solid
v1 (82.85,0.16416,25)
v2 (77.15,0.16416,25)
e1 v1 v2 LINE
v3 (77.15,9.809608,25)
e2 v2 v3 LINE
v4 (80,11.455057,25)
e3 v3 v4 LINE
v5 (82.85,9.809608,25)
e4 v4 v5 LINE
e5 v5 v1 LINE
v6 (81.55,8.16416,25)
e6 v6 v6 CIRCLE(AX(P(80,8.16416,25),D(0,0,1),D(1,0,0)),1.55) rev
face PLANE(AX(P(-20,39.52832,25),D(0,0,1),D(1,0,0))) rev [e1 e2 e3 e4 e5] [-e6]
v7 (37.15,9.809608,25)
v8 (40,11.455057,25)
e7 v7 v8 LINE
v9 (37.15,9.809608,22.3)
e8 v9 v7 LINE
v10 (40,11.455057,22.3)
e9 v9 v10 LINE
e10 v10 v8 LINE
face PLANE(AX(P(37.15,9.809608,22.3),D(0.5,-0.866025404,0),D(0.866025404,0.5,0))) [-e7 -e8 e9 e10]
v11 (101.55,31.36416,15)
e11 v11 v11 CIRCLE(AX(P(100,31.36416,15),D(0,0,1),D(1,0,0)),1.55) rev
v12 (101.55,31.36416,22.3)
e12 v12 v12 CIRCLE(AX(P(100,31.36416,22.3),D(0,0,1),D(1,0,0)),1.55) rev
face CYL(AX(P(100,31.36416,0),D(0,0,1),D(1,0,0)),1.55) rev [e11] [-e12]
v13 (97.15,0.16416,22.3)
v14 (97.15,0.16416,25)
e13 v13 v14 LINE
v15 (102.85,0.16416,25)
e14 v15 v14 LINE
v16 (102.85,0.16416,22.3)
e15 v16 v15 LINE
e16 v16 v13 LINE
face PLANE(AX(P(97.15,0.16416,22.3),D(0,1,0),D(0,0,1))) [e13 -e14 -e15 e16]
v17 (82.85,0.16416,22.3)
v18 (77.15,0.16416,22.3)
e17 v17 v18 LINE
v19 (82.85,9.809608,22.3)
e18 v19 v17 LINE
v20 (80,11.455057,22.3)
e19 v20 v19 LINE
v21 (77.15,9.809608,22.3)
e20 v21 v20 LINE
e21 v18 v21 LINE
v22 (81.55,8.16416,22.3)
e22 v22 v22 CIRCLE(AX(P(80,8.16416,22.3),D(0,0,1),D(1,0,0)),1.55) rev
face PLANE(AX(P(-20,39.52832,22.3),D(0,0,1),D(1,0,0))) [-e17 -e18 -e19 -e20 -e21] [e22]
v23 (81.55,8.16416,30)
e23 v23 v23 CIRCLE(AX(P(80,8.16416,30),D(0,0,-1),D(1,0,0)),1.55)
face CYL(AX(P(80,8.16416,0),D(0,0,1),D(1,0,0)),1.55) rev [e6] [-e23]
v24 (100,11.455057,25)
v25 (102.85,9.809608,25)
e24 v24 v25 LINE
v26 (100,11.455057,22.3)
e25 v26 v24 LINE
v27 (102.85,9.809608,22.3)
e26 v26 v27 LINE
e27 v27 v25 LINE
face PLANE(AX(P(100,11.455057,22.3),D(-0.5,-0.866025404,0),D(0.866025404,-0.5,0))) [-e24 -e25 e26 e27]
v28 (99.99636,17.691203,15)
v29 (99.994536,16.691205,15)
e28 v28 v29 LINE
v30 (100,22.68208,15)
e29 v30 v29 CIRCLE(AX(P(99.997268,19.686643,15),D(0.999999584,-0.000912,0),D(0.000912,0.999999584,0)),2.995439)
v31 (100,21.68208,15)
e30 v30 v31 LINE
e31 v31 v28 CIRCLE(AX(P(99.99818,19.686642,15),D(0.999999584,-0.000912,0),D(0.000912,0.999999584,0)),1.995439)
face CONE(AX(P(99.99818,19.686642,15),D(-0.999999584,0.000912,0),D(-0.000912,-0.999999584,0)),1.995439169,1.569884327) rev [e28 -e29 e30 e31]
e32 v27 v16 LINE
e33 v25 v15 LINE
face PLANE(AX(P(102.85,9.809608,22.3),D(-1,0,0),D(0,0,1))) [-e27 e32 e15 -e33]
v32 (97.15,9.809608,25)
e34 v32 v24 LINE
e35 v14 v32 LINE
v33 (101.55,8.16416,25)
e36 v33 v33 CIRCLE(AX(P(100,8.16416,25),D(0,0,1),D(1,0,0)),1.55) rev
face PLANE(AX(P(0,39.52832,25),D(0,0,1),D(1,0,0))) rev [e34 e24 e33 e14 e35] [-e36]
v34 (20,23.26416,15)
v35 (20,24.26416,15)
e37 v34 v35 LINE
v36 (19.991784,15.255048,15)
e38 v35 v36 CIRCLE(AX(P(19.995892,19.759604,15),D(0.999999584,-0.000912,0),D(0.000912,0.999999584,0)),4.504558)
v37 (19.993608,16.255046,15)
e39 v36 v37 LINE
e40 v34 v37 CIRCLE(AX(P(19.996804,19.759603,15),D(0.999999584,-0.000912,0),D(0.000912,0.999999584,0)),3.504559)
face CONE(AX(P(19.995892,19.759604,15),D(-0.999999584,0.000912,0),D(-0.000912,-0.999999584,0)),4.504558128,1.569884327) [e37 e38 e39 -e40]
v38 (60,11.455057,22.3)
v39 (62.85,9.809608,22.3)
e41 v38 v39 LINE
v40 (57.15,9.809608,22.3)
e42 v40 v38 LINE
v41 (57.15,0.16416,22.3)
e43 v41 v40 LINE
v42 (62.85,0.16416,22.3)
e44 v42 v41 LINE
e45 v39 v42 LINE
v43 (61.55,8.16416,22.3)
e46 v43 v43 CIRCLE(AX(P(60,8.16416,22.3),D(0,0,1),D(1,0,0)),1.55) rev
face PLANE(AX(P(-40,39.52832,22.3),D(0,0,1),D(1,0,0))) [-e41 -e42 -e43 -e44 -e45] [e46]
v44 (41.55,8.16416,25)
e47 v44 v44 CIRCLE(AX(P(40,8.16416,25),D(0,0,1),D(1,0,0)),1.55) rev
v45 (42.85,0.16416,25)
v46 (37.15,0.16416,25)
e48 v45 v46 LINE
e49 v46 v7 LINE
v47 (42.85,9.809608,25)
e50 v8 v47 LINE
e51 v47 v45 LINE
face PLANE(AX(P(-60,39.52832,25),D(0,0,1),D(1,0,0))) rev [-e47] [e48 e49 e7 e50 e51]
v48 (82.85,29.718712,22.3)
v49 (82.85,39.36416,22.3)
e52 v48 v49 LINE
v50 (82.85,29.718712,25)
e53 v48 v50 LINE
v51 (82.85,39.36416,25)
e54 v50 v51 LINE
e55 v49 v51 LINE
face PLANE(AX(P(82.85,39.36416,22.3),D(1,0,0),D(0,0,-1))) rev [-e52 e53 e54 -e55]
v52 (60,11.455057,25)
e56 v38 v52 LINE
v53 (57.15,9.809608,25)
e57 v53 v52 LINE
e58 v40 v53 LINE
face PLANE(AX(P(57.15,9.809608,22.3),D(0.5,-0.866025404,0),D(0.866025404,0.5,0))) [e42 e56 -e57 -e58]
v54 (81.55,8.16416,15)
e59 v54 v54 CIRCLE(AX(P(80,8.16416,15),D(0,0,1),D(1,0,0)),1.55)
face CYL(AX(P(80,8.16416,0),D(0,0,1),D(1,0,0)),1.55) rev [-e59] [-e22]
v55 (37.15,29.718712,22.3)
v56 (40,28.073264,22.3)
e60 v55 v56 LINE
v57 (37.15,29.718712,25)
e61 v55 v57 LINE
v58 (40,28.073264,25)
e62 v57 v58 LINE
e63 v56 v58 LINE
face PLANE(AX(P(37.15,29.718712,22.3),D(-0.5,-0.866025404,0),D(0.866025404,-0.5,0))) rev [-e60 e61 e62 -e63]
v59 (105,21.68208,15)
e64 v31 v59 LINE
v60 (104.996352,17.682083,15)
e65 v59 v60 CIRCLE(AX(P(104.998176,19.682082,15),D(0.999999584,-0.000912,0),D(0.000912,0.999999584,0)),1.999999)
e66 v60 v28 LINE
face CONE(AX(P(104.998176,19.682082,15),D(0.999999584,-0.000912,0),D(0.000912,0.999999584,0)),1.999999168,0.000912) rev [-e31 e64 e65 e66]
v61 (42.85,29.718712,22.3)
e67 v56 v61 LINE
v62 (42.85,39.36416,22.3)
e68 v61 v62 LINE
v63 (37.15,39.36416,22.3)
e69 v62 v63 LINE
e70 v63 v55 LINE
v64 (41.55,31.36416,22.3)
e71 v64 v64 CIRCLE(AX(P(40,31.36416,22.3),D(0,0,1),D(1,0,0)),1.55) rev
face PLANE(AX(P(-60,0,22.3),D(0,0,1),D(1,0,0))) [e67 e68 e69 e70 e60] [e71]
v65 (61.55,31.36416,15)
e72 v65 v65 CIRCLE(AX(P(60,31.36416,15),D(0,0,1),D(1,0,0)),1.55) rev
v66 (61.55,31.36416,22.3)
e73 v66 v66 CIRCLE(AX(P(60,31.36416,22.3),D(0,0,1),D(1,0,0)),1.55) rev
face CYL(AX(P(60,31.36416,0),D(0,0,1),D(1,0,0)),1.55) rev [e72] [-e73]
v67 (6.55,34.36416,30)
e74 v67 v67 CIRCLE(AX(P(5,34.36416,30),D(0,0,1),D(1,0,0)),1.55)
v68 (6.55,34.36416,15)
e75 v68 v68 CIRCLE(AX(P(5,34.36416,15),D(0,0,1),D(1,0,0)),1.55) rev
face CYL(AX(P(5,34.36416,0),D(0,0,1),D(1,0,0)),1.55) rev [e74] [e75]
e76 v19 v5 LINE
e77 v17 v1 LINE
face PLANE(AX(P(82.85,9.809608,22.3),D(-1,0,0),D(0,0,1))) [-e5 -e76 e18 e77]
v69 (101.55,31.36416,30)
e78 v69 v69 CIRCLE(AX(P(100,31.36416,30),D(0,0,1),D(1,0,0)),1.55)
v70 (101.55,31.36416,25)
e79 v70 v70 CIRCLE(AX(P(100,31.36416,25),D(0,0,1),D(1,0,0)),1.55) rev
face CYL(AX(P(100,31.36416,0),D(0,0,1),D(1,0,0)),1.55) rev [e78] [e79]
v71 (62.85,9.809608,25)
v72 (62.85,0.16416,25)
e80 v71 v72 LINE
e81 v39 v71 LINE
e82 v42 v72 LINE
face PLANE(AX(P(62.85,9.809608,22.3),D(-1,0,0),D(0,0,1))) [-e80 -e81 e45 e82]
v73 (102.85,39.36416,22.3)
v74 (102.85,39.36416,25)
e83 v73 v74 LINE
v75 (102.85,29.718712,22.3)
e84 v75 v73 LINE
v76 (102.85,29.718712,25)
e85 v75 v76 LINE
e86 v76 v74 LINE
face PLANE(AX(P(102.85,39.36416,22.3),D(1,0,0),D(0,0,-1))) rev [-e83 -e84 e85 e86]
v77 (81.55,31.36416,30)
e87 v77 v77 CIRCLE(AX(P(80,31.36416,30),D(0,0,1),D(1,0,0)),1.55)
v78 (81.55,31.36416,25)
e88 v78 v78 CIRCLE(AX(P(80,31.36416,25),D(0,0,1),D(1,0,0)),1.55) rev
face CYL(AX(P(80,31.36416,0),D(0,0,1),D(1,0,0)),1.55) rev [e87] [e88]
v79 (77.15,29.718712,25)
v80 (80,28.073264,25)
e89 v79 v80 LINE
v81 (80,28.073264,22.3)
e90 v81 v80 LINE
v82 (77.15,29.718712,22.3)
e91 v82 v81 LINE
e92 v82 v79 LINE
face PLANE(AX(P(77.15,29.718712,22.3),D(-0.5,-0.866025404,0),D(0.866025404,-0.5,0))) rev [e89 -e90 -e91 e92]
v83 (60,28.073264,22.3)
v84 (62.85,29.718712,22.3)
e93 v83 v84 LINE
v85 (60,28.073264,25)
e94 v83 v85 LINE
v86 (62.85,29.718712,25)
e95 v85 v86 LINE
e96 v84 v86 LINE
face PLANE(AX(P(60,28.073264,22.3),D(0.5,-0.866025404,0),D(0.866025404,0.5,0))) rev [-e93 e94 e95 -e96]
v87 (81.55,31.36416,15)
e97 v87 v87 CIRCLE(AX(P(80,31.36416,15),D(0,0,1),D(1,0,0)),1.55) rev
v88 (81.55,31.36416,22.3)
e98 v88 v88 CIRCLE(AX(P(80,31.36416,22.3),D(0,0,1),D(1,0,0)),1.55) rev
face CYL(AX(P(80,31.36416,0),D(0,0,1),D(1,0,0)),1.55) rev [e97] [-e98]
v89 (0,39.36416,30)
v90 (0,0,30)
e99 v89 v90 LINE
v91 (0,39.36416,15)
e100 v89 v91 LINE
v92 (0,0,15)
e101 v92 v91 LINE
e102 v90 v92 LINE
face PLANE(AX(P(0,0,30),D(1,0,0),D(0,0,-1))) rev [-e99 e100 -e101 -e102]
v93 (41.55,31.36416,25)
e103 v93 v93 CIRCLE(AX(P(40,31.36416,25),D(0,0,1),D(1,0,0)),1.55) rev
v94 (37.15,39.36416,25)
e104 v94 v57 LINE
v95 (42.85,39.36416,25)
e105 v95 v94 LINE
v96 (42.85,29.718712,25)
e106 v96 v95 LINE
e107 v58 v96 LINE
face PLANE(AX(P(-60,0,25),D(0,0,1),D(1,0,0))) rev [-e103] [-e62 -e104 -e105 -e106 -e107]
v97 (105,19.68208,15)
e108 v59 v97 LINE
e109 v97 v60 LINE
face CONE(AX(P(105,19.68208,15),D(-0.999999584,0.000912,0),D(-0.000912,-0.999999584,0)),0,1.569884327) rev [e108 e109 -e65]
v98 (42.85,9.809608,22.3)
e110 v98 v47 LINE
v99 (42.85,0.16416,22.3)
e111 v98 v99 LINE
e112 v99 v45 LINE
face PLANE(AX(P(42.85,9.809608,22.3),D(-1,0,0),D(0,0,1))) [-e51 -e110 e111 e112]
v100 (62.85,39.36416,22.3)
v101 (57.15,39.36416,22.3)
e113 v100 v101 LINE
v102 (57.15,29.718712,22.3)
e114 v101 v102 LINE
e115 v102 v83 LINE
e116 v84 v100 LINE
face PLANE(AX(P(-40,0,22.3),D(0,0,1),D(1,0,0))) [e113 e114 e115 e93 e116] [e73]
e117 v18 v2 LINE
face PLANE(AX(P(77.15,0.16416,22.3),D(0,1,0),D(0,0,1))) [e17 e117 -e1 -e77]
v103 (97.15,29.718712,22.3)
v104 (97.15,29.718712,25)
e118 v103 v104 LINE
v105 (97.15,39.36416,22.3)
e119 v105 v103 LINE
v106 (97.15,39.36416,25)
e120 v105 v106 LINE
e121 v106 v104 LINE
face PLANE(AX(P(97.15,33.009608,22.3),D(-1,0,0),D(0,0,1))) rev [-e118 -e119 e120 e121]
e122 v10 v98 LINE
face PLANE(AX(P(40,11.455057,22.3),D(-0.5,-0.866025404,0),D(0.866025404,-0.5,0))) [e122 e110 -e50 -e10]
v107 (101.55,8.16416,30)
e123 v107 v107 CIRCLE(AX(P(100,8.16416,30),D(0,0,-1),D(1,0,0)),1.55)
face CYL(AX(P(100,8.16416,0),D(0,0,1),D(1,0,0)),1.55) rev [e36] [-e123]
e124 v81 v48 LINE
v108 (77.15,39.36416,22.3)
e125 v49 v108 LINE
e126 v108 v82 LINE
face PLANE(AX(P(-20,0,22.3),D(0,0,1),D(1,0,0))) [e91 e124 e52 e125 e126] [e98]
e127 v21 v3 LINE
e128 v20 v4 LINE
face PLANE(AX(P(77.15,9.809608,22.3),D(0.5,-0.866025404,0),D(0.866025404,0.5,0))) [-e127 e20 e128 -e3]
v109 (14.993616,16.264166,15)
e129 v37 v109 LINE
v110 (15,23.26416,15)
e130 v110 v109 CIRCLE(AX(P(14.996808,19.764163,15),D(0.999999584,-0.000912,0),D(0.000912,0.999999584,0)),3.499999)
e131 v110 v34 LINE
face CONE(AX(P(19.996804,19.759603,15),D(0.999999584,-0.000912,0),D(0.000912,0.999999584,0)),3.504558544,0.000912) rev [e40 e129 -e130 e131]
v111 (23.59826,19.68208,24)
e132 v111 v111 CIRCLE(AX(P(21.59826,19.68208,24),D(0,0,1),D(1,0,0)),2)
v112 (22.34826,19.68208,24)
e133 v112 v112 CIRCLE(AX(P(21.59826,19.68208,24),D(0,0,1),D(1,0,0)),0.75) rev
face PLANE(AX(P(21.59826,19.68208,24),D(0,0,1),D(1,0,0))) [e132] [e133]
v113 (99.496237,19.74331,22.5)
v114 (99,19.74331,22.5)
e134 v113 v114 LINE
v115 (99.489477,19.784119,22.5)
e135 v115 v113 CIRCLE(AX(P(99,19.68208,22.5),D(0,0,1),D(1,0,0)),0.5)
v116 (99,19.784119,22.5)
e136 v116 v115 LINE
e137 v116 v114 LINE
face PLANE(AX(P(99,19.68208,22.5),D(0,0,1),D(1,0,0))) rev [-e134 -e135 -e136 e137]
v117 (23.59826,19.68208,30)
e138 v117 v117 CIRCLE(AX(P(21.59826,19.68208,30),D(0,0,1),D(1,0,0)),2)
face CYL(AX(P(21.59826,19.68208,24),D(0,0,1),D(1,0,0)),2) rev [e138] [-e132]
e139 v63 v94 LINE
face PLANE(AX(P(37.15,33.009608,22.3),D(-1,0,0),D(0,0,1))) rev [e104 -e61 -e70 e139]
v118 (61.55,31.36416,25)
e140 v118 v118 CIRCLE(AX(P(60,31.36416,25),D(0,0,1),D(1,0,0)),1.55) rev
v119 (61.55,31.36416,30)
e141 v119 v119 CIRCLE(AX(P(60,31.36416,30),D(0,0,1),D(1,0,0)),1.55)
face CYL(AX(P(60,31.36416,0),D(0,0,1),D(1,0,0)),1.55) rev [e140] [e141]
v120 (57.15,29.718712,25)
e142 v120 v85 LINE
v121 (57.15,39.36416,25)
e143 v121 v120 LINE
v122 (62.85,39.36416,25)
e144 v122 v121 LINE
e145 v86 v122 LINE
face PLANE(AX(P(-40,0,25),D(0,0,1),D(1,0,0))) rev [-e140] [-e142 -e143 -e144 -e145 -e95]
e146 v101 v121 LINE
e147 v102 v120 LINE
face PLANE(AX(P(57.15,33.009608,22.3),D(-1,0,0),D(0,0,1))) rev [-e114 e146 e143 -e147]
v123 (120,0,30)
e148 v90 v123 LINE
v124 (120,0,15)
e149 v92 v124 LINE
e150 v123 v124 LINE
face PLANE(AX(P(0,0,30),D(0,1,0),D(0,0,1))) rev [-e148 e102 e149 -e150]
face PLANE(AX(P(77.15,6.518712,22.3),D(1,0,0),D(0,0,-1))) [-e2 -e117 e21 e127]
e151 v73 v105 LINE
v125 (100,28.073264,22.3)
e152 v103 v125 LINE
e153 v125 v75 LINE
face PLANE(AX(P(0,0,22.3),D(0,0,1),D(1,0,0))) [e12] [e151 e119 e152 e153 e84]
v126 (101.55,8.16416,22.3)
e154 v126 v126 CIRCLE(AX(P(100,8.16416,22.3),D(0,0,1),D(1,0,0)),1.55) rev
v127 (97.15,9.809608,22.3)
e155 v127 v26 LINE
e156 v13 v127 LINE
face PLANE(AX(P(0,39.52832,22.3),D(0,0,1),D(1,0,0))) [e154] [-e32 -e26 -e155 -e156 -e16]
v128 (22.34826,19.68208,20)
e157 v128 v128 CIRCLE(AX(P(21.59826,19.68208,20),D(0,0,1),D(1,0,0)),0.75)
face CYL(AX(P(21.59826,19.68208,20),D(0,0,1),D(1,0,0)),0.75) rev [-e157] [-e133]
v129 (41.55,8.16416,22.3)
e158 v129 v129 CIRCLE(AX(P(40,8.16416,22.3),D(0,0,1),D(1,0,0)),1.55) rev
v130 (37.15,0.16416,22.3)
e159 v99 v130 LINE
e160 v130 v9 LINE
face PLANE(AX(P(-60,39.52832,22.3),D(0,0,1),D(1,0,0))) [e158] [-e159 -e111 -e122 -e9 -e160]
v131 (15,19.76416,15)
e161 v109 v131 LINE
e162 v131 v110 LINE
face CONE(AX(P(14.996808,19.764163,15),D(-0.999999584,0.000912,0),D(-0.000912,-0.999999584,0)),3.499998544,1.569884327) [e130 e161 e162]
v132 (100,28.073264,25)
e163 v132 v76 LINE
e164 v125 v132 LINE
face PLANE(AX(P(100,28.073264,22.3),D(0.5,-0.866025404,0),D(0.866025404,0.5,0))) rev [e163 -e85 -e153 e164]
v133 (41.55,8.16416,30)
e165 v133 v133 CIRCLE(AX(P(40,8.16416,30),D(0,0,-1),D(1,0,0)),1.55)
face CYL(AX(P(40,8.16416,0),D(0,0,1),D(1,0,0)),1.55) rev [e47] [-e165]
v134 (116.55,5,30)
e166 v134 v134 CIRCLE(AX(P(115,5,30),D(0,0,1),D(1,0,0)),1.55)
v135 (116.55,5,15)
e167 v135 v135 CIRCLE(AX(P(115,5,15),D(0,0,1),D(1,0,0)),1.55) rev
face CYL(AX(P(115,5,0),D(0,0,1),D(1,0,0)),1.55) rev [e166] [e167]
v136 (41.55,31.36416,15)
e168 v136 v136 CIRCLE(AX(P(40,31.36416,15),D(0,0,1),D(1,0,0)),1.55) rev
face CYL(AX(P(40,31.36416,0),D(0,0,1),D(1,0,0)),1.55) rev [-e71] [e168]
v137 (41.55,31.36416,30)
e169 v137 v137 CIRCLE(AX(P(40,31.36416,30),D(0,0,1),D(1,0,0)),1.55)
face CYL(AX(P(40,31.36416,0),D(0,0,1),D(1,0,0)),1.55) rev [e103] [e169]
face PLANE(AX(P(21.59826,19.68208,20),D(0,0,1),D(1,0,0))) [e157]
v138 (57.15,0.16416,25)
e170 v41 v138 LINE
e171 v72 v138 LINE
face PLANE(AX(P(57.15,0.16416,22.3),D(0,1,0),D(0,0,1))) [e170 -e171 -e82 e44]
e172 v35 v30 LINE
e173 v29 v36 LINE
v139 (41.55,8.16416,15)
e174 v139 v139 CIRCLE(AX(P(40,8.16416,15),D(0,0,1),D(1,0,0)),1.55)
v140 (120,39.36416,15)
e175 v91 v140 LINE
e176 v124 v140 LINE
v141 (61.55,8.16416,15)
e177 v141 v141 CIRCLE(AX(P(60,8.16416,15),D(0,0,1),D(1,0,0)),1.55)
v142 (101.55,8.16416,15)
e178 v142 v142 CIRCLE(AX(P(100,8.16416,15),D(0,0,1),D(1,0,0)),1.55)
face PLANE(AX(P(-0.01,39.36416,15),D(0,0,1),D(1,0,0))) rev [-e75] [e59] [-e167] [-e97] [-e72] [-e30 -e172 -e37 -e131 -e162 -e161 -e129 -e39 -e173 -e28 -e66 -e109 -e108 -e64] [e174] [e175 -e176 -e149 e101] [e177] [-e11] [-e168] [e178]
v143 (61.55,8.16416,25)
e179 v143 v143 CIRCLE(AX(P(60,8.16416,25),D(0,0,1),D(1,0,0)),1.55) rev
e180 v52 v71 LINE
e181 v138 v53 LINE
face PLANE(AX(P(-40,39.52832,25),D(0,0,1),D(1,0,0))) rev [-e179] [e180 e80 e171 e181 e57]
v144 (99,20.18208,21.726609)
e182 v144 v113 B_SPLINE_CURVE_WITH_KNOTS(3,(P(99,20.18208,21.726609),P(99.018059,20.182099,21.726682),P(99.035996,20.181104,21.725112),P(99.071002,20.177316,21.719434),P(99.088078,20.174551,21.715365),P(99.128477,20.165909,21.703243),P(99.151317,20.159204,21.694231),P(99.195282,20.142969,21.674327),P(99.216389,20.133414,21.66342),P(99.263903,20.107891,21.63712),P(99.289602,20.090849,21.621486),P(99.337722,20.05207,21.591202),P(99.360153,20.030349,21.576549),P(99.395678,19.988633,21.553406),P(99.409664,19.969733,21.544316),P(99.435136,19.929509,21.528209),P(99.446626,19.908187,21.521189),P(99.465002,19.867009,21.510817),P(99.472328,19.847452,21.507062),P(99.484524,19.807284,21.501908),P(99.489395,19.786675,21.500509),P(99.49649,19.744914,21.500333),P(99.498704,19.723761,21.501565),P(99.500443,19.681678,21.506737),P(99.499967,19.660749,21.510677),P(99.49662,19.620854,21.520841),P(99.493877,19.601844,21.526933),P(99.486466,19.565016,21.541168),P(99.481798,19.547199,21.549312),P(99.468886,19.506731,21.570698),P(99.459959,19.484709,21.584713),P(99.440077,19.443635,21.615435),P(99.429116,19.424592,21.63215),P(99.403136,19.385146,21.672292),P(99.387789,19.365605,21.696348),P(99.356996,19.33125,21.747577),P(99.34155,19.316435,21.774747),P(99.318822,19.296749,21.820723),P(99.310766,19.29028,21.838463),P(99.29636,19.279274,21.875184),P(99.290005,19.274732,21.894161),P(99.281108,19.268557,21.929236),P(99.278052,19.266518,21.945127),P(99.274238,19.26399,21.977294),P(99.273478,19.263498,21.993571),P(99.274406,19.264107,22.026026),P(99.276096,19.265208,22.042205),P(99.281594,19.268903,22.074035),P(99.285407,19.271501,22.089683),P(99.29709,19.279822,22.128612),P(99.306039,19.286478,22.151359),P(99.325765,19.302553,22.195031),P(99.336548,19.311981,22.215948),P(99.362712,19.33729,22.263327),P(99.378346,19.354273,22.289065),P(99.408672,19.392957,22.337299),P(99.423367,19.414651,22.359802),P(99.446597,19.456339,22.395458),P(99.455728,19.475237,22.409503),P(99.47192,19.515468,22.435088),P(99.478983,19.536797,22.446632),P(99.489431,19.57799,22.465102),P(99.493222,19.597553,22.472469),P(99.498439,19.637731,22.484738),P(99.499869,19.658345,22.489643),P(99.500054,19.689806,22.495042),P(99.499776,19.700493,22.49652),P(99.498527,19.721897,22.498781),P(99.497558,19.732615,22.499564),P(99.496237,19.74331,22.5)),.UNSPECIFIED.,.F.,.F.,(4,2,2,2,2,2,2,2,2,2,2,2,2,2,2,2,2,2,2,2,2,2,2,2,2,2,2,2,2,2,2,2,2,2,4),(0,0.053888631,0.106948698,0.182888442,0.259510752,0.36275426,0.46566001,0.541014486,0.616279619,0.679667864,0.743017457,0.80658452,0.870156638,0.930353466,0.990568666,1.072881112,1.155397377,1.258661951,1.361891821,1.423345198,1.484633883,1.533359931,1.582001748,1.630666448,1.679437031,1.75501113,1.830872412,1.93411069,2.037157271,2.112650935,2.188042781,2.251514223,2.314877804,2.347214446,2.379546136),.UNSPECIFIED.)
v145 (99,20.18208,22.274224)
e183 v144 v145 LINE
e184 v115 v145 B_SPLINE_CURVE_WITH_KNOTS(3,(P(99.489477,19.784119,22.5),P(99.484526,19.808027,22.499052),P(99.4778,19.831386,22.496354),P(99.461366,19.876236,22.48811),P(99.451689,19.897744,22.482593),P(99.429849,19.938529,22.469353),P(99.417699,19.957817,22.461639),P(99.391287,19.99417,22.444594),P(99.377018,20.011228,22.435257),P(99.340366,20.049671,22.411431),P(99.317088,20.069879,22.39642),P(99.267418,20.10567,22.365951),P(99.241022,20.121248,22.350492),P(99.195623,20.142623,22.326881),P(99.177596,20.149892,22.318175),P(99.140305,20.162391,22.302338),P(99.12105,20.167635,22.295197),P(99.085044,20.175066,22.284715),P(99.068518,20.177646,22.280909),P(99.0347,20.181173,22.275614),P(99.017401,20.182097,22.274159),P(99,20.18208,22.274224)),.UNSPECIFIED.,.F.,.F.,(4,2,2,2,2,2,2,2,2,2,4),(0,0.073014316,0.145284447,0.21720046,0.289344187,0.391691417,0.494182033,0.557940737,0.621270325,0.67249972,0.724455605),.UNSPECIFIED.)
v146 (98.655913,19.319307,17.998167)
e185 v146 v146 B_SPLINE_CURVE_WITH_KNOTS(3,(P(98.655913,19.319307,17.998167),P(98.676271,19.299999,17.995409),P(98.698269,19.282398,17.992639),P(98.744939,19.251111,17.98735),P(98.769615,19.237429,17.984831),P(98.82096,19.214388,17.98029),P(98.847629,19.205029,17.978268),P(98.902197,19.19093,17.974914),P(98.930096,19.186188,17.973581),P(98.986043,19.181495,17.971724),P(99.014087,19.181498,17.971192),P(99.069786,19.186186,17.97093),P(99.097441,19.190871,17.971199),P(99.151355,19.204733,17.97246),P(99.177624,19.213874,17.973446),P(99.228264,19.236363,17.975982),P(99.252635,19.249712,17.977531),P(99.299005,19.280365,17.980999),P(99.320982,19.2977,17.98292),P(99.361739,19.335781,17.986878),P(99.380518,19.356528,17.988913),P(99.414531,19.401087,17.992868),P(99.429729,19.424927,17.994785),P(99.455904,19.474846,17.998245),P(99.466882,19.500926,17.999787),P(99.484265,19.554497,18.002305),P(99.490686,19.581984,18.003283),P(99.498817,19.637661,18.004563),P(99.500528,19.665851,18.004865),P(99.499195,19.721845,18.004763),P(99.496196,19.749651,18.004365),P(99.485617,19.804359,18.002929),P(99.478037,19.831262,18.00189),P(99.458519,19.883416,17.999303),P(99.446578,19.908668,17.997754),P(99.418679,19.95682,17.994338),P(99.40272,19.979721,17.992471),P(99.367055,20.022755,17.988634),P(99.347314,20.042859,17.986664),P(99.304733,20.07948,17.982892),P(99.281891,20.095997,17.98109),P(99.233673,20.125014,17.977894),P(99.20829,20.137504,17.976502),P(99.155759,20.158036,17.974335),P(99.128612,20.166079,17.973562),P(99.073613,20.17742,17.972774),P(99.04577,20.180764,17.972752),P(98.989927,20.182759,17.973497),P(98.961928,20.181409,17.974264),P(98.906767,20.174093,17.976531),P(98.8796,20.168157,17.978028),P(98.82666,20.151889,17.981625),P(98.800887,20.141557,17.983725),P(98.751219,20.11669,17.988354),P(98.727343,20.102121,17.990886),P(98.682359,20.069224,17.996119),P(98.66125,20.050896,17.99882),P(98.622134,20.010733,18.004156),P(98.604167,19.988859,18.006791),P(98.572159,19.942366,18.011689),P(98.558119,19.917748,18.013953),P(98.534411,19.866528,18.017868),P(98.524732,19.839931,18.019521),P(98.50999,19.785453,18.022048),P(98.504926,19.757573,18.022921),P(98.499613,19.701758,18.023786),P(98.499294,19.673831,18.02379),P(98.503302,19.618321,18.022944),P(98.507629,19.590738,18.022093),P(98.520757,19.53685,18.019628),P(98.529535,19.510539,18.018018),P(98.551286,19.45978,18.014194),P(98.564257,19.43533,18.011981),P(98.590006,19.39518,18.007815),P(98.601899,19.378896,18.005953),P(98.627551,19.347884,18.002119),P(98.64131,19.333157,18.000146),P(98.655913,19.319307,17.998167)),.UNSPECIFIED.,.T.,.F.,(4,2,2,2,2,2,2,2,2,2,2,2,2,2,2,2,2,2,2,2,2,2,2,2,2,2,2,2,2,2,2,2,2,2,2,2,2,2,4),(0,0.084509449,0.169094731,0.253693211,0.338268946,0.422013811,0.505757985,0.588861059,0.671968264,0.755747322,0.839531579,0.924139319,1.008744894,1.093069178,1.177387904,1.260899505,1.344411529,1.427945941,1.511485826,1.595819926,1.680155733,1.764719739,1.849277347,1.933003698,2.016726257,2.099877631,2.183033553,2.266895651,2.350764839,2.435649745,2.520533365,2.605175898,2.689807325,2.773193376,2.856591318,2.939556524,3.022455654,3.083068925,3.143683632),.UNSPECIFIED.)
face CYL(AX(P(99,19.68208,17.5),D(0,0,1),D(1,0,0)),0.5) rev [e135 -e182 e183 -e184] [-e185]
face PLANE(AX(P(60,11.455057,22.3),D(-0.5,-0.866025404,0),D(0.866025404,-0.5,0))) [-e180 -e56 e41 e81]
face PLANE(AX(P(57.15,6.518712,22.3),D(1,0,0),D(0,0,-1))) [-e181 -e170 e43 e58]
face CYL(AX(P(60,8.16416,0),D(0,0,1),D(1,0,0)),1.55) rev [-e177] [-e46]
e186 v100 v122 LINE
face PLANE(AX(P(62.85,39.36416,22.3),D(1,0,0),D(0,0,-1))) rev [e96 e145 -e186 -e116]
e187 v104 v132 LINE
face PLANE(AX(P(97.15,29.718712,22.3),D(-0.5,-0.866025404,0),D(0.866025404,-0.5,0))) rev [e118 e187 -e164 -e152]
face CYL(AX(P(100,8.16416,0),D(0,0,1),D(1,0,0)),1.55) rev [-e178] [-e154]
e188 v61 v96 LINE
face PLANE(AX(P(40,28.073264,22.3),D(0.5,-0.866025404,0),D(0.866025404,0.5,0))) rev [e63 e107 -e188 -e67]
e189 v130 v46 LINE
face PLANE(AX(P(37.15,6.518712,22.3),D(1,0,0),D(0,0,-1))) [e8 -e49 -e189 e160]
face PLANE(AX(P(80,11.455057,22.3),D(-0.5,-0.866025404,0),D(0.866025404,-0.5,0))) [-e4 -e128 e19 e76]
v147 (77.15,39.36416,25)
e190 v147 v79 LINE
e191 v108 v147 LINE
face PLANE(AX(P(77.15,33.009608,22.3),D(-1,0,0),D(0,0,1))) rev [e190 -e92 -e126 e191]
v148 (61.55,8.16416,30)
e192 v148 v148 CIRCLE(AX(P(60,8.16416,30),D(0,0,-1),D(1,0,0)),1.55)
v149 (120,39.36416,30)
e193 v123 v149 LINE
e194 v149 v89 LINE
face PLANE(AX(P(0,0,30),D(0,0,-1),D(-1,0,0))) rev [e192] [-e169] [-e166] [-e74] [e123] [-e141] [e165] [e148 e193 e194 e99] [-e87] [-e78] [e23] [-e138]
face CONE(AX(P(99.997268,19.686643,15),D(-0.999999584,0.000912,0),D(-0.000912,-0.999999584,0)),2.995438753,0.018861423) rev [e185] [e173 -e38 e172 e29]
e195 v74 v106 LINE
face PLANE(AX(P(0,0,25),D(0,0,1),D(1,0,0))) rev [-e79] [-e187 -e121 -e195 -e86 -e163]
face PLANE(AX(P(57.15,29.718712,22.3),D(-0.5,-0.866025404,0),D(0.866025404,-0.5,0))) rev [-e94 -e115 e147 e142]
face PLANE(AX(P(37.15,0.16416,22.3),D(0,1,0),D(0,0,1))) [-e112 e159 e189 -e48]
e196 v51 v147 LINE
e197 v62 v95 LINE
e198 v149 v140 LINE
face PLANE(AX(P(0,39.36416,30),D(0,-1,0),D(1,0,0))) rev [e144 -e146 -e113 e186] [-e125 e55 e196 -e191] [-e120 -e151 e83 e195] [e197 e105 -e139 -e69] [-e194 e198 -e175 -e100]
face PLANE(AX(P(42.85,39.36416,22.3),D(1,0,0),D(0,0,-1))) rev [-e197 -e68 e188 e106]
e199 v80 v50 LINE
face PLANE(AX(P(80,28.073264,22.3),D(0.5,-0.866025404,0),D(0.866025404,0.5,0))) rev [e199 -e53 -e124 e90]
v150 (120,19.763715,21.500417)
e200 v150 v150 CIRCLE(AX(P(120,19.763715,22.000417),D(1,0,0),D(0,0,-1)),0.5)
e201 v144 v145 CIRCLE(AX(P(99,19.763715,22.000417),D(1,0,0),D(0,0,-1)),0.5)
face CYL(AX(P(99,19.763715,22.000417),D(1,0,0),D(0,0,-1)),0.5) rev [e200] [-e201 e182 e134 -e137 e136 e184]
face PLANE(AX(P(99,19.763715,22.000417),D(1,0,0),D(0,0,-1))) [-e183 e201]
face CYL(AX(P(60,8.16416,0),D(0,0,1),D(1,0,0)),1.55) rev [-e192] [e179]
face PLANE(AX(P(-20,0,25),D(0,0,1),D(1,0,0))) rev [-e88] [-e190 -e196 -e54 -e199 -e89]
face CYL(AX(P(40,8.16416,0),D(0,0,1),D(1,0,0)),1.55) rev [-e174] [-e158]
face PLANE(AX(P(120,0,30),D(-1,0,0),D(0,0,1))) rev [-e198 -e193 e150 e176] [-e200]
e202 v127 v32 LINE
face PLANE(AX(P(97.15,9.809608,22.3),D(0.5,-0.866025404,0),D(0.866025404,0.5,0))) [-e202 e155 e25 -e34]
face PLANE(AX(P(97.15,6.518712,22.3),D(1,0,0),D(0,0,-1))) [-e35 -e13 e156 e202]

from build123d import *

# Parameters (mm, degrees)
SKIZZE2_W                        = 120
SKIZZE2_H                        = 39.364160046
AUFSATZ_LINEAR_AUSTRAGEN1_DEPTH  = 30
SKIZZE24_R                       = 1.55
SCHNITT_LINEAR_AUSTRAGEN4_DEPTH  = 130.805766806
SKIZZE46_R                       = 2.85
SCHNITT_LINEAR_AUSTRAGEN15_DEPTH = 10
SCHNITT_LINEAR_START             = -5
SCHNITT_LINEAR_AUSTRAGEN25_DEPTH = 2.7
LINEARES_MUSTER1_COUNT           = 4
LINEARES_MUSTER1_PITCH           = 20
SPIEGELN2_COPY_1_SKETCH_R        = 2.85
SPIEGELN2_COPY_1_DEPTH           = 10
SPIEGELN2_COPY_2_SKETCH_R        = 2.85
SPIEGELN2_COPY_2_DEPTH           = 10
SPIEGELN2_COPY_3_SKETCH_R        = 2.85
SPIEGELN2_COPY_3_DEPTH           = 10
SPIEGELN2_START                  = -5
SPIEGELN2_COPY_4_DEPTH           = 2.7
SPIEGELN2_COPY_5_DEPTH           = 2.7
SPIEGELN2_COPY_6_DEPTH           = 2.7
SKIZZE51_R                       = 1.55
SCHNITT_LINEAR_AUSTRAGEN26_DEPTH = 130.805766806
SKIZZE75_R                       = 0.75
SCHNITT_LINEAR_AUSTRAGEN28_DEPTH = 10
SKIZZE76_R                       = 2
SCHNITT_LINEAR_AUSTRAGEN29_DEPTH = 6
SKIZZE80_R                       = 0.5
SCHNITT_LINEAR_AUSTRAGEN34_DEPTH = 21
SCHNITT_LINEAR_START_2           = -7.5
SKIZZE81_R                       = 0.5
SCHNITT_LINEAR_AUSTRAGEN36_DEPTH = 5
ABSPALTEN3_OUTLINE_W             = 120
ABSPALTEN3_OUTLINE_H             = 39.364160046
ABSPALTEN3_OUTLINE_R             = 1.55
ABSPALTEN3_DEPTH                 = 15


# Read off the part's stored shape, not the designer's step: Abspalten3
with BuildPart() as part:
    # Skizze2 → Aufsatz-Linear austragen1 (new body)
    with BuildSketch(Plane.XY):
        with Locations((60, 19.682080023)):
            Rectangle(SKIZZE2_W, SKIZZE2_H)
    extrude(amount=AUFSATZ_LINEAR_AUSTRAGEN1_DEPTH)

    # Skizze24 → Schnitt-Linear austragen4 (cut, through all)
    with BuildSketch(Plane.XY.offset(30)):
        with Locations((40, 31.364160046)):
            Circle(SKIZZE24_R)
        with Locations((60, 31.364160046)):
            Circle(SKIZZE24_R)
        with Locations((80, 31.364160046)):
            Circle(SKIZZE24_R)
        with Locations((100, 31.364160046)):
            Circle(SKIZZE24_R)
    schnitt_linear_austragen4 = extrude(amount=-SCHNITT_LINEAR_AUSTRAGEN4_DEPTH, mode=Mode.SUBTRACT)

    # Skizze46 → Schnitt-Linear austragen15 (cut)
    with BuildSketch(Plane(origin=(0, 0, 0), x_dir=(-1, 0, 0), z_dir=(0, 0, -1))):
        with Locations((-100, 31.364160046)):
            Circle(SKIZZE46_R)
    schnitt_linear_austragen15 = extrude(amount=-SCHNITT_LINEAR_AUSTRAGEN15_DEPTH, mode=Mode.SUBTRACT)

    # Skizze50 → Schnitt-Linear austragen25 (cut)
    with BuildSketch(Plane.XY.offset(30).offset(SCHNITT_LINEAR_START)):
        Polygon((97.15, 33.009608314), (97.15, 39.364160046), (102.85, 39.364160046), (102.85, 33.009608314), (102.85, 29.718711779), (100, 28.073263512), (97.15, 29.718711779), align=None)
    schnitt_linear_austragen25 = extrude(amount=-SCHNITT_LINEAR_AUSTRAGEN25_DEPTH, mode=Mode.SUBTRACT)

    # Lineares Muster1: Schnitt-Linear austragen15, Schnitt-Linear austragen25 ×4
    with Locations(*[(-i * LINEARES_MUSTER1_PITCH, 0, 0) for i in range(1, LINEARES_MUSTER1_COUNT)]):
        add(schnitt_linear_austragen15, mode=Mode.SUBTRACT)
        add(schnitt_linear_austragen25, mode=Mode.SUBTRACT)

    # Spiegeln2: Schnitt-Linear austragen15, Schnitt-Linear austragen25 across plane
    add(schnitt_linear_austragen15.mirror(Plane.ZX.offset(19.764160046)), mode=Mode.SUBTRACT)
    add(schnitt_linear_austragen25.mirror(Plane.ZX.offset(19.764160046)), mode=Mode.SUBTRACT)

    # Spiegeln2 copy 1 sketch → Spiegeln2 copy 1 (cut)
    with BuildSketch(Plane(origin=(-20, 39.528320093, 0), x_dir=(-1, 0, 0), z_dir=(0, 0, -1))):
        with Locations((-100, -31.364160046)):
            Circle(SPIEGELN2_COPY_1_SKETCH_R)
    extrude(amount=-SPIEGELN2_COPY_1_DEPTH, mode=Mode.SUBTRACT)

    # Spiegeln2 copy 2 sketch → Spiegeln2 copy 2 (cut)
    with BuildSketch(Plane(origin=(-40, 39.528320093, 0), x_dir=(-1, 0, 0), z_dir=(0, 0, -1))):
        with Locations((-100, -31.364160046)):
            Circle(SPIEGELN2_COPY_2_SKETCH_R)
    extrude(amount=-SPIEGELN2_COPY_2_DEPTH, mode=Mode.SUBTRACT)

    # Spiegeln2 copy 3 sketch → Spiegeln2 copy 3 (cut)
    with BuildSketch(Plane(origin=(-60, 39.528320093, 0), x_dir=(-1, 0, 0), z_dir=(0, 0, -1))):
        with Locations((-100, -31.364160046)):
            Circle(SPIEGELN2_COPY_3_SKETCH_R)
    extrude(amount=-SPIEGELN2_COPY_3_DEPTH, mode=Mode.SUBTRACT)

    # Spiegeln2 copy 4 sketch → Spiegeln2 copy 4 (cut)
    with BuildSketch(Plane(origin=(-20, 39.528320093, 30), x_dir=(1, 0, 0), z_dir=(0, 0, 1)).offset(SPIEGELN2_START)):
        Polygon((97.15, -33.009608314), (97.15, -39.364160046), (102.85, -39.364160046), (102.85, -33.009608314), (102.85, -29.718711779), (100, -28.073263512), (97.15, -29.718711779), align=None)
    extrude(amount=-SPIEGELN2_COPY_4_DEPTH, mode=Mode.SUBTRACT)

    # Spiegeln2 copy 5 sketch → Spiegeln2 copy 5 (cut)
    with BuildSketch(Plane(origin=(-40, 39.528320093, 30), x_dir=(1, 0, 0), z_dir=(0, 0, 1)).offset(SPIEGELN2_START)):
        Polygon((97.15, -33.009608314), (97.15, -39.364160046), (102.85, -39.364160046), (102.85, -33.009608314), (102.85, -29.718711779), (100, -28.073263512), (97.15, -29.718711779), align=None)
    extrude(amount=-SPIEGELN2_COPY_5_DEPTH, mode=Mode.SUBTRACT)

    # Spiegeln2 copy 6 sketch → Spiegeln2 copy 6 (cut)
    with BuildSketch(Plane(origin=(-60, 39.528320093, 30), x_dir=(1, 0, 0), z_dir=(0, 0, 1)).offset(SPIEGELN2_START)):
        Polygon((97.15, -33.009608314), (97.15, -39.364160046), (102.85, -39.364160046), (102.85, -33.009608314), (102.85, -29.718711779), (100, -28.073263512), (97.15, -29.718711779), align=None)
    extrude(amount=-SPIEGELN2_COPY_6_DEPTH, mode=Mode.SUBTRACT)

    # Spiegeln3: Schnitt-Linear austragen4 across plane
    add(schnitt_linear_austragen4.mirror(Plane.ZX.offset(19.764160046)), mode=Mode.SUBTRACT)

    # Skizze51 → Schnitt-Linear austragen26 (cut, through all)
    with BuildSketch(Plane.XY.offset(30)):
        with Locations((5, 34.364160046)):
            Circle(SKIZZE51_R)
        with Locations((115, 5)):
            Circle(SKIZZE51_R)
    extrude(amount=-SCHNITT_LINEAR_AUSTRAGEN26_DEPTH, mode=Mode.SUBTRACT)

    # Skizze73 → Schnitt-Rotation5 (revolve, cut)
    with BuildSketch(Plane.XY.offset(15)):
        Polygon((15, 19.764160046), (15, 23.264160046), (20, 23.264160046), (20, 24.264160046), (100, 22.682080023), (100, 21.682080023), (105, 21.682080023), (105, 19.682080023), align=None)
    revolve(axis=Axis((105, 19.682080023, 15), (-0.9999995841280241, 0.0009119998787298228, 0)), mode=Mode.SUBTRACT)

    # Skizze75 → Schnitt-Linear austragen28 (cut)
    with BuildSketch(Plane.XY.offset(30)):
        with Locations((21.598259807, 19.682080023)):
            Circle(SKIZZE75_R)
    extrude(amount=-SCHNITT_LINEAR_AUSTRAGEN28_DEPTH, mode=Mode.SUBTRACT)

    # Skizze76 → Schnitt-Linear austragen29 (cut)
    with BuildSketch(Plane.XY.offset(30)):
        with Locations((21.598259807, 19.682080023)):
            Circle(SKIZZE76_R)
    extrude(amount=-SCHNITT_LINEAR_AUSTRAGEN29_DEPTH, mode=Mode.SUBTRACT)

    # Skizze80 → Schnitt-Linear austragen34 (cut)
    with BuildSketch(Plane(origin=(120, 0, 0), x_dir=(0, 0, -1), z_dir=(1, 0, 0))):
        with Locations((-22.000416524, 19.763714623)):
            Circle(SKIZZE80_R)
    schnitt_linear_austragen34 = extrude(amount=-SCHNITT_LINEAR_AUSTRAGEN34_DEPTH, mode=Mode.SUBTRACT)

    # Skizze81 → Schnitt-Linear austragen36 (cut)
    with BuildSketch(Plane.XY.offset(30).offset(SCHNITT_LINEAR_START_2)):
        with Locations(Location((99, 19.682080023, 0), (0, 0, 7.034090001))):
            Circle(SKIZZE81_R)
    schnitt_linear_austragen36 = extrude(amount=-SCHNITT_LINEAR_AUSTRAGEN36_DEPTH, mode=Mode.SUBTRACT)

    # Spiegeln4: Schnitt-Linear austragen34, Schnitt-Linear austragen36 across plane
    add(schnitt_linear_austragen34.mirror(Plane.XY.offset(15)), mode=Mode.SUBTRACT)
    add(schnitt_linear_austragen36.mirror(Plane.XY.offset(15)), mode=Mode.SUBTRACT)

    # Abspalten3 outline → Abspalten3 (cut)
    with BuildSketch(Plane.XY):
        with Locations((60, 19.682080023)):
            Rectangle(ABSPALTEN3_OUTLINE_W, ABSPALTEN3_OUTLINE_H)
        with Locations((115, 5)):
            Circle(ABSPALTEN3_OUTLINE_R, mode=Mode.SUBTRACT)
        with Locations((5, 34.364160046)):
            Circle(ABSPALTEN3_OUTLINE_R, mode=Mode.SUBTRACT)
        with Locations((40, 8.164160046)):
            Circle(ABSPALTEN3_OUTLINE_R, mode=Mode.SUBTRACT)
        with Locations((60, 8.164160046)):
            Circle(ABSPALTEN3_OUTLINE_R, mode=Mode.SUBTRACT)
        with Locations((80, 8.164160046)):
            Circle(ABSPALTEN3_OUTLINE_R, mode=Mode.SUBTRACT)
        with Locations((100, 8.164160046)):
            Circle(ABSPALTEN3_OUTLINE_R, mode=Mode.SUBTRACT)
        with Locations((40, 31.364160046)):
            Circle(ABSPALTEN3_OUTLINE_R, mode=Mode.SUBTRACT)
        with Locations((100, 31.364160046)):
            Circle(ABSPALTEN3_OUTLINE_R, mode=Mode.SUBTRACT)
        with Locations((60, 31.364160046)):
            Circle(ABSPALTEN3_OUTLINE_R, mode=Mode.SUBTRACT)
        with Locations((80, 31.364160046)):
            Circle(ABSPALTEN3_OUTLINE_R, mode=Mode.SUBTRACT)
    extrude(amount=ABSPALTEN3_DEPTH, mode=Mode.SUBTRACT)


solid = part.part
